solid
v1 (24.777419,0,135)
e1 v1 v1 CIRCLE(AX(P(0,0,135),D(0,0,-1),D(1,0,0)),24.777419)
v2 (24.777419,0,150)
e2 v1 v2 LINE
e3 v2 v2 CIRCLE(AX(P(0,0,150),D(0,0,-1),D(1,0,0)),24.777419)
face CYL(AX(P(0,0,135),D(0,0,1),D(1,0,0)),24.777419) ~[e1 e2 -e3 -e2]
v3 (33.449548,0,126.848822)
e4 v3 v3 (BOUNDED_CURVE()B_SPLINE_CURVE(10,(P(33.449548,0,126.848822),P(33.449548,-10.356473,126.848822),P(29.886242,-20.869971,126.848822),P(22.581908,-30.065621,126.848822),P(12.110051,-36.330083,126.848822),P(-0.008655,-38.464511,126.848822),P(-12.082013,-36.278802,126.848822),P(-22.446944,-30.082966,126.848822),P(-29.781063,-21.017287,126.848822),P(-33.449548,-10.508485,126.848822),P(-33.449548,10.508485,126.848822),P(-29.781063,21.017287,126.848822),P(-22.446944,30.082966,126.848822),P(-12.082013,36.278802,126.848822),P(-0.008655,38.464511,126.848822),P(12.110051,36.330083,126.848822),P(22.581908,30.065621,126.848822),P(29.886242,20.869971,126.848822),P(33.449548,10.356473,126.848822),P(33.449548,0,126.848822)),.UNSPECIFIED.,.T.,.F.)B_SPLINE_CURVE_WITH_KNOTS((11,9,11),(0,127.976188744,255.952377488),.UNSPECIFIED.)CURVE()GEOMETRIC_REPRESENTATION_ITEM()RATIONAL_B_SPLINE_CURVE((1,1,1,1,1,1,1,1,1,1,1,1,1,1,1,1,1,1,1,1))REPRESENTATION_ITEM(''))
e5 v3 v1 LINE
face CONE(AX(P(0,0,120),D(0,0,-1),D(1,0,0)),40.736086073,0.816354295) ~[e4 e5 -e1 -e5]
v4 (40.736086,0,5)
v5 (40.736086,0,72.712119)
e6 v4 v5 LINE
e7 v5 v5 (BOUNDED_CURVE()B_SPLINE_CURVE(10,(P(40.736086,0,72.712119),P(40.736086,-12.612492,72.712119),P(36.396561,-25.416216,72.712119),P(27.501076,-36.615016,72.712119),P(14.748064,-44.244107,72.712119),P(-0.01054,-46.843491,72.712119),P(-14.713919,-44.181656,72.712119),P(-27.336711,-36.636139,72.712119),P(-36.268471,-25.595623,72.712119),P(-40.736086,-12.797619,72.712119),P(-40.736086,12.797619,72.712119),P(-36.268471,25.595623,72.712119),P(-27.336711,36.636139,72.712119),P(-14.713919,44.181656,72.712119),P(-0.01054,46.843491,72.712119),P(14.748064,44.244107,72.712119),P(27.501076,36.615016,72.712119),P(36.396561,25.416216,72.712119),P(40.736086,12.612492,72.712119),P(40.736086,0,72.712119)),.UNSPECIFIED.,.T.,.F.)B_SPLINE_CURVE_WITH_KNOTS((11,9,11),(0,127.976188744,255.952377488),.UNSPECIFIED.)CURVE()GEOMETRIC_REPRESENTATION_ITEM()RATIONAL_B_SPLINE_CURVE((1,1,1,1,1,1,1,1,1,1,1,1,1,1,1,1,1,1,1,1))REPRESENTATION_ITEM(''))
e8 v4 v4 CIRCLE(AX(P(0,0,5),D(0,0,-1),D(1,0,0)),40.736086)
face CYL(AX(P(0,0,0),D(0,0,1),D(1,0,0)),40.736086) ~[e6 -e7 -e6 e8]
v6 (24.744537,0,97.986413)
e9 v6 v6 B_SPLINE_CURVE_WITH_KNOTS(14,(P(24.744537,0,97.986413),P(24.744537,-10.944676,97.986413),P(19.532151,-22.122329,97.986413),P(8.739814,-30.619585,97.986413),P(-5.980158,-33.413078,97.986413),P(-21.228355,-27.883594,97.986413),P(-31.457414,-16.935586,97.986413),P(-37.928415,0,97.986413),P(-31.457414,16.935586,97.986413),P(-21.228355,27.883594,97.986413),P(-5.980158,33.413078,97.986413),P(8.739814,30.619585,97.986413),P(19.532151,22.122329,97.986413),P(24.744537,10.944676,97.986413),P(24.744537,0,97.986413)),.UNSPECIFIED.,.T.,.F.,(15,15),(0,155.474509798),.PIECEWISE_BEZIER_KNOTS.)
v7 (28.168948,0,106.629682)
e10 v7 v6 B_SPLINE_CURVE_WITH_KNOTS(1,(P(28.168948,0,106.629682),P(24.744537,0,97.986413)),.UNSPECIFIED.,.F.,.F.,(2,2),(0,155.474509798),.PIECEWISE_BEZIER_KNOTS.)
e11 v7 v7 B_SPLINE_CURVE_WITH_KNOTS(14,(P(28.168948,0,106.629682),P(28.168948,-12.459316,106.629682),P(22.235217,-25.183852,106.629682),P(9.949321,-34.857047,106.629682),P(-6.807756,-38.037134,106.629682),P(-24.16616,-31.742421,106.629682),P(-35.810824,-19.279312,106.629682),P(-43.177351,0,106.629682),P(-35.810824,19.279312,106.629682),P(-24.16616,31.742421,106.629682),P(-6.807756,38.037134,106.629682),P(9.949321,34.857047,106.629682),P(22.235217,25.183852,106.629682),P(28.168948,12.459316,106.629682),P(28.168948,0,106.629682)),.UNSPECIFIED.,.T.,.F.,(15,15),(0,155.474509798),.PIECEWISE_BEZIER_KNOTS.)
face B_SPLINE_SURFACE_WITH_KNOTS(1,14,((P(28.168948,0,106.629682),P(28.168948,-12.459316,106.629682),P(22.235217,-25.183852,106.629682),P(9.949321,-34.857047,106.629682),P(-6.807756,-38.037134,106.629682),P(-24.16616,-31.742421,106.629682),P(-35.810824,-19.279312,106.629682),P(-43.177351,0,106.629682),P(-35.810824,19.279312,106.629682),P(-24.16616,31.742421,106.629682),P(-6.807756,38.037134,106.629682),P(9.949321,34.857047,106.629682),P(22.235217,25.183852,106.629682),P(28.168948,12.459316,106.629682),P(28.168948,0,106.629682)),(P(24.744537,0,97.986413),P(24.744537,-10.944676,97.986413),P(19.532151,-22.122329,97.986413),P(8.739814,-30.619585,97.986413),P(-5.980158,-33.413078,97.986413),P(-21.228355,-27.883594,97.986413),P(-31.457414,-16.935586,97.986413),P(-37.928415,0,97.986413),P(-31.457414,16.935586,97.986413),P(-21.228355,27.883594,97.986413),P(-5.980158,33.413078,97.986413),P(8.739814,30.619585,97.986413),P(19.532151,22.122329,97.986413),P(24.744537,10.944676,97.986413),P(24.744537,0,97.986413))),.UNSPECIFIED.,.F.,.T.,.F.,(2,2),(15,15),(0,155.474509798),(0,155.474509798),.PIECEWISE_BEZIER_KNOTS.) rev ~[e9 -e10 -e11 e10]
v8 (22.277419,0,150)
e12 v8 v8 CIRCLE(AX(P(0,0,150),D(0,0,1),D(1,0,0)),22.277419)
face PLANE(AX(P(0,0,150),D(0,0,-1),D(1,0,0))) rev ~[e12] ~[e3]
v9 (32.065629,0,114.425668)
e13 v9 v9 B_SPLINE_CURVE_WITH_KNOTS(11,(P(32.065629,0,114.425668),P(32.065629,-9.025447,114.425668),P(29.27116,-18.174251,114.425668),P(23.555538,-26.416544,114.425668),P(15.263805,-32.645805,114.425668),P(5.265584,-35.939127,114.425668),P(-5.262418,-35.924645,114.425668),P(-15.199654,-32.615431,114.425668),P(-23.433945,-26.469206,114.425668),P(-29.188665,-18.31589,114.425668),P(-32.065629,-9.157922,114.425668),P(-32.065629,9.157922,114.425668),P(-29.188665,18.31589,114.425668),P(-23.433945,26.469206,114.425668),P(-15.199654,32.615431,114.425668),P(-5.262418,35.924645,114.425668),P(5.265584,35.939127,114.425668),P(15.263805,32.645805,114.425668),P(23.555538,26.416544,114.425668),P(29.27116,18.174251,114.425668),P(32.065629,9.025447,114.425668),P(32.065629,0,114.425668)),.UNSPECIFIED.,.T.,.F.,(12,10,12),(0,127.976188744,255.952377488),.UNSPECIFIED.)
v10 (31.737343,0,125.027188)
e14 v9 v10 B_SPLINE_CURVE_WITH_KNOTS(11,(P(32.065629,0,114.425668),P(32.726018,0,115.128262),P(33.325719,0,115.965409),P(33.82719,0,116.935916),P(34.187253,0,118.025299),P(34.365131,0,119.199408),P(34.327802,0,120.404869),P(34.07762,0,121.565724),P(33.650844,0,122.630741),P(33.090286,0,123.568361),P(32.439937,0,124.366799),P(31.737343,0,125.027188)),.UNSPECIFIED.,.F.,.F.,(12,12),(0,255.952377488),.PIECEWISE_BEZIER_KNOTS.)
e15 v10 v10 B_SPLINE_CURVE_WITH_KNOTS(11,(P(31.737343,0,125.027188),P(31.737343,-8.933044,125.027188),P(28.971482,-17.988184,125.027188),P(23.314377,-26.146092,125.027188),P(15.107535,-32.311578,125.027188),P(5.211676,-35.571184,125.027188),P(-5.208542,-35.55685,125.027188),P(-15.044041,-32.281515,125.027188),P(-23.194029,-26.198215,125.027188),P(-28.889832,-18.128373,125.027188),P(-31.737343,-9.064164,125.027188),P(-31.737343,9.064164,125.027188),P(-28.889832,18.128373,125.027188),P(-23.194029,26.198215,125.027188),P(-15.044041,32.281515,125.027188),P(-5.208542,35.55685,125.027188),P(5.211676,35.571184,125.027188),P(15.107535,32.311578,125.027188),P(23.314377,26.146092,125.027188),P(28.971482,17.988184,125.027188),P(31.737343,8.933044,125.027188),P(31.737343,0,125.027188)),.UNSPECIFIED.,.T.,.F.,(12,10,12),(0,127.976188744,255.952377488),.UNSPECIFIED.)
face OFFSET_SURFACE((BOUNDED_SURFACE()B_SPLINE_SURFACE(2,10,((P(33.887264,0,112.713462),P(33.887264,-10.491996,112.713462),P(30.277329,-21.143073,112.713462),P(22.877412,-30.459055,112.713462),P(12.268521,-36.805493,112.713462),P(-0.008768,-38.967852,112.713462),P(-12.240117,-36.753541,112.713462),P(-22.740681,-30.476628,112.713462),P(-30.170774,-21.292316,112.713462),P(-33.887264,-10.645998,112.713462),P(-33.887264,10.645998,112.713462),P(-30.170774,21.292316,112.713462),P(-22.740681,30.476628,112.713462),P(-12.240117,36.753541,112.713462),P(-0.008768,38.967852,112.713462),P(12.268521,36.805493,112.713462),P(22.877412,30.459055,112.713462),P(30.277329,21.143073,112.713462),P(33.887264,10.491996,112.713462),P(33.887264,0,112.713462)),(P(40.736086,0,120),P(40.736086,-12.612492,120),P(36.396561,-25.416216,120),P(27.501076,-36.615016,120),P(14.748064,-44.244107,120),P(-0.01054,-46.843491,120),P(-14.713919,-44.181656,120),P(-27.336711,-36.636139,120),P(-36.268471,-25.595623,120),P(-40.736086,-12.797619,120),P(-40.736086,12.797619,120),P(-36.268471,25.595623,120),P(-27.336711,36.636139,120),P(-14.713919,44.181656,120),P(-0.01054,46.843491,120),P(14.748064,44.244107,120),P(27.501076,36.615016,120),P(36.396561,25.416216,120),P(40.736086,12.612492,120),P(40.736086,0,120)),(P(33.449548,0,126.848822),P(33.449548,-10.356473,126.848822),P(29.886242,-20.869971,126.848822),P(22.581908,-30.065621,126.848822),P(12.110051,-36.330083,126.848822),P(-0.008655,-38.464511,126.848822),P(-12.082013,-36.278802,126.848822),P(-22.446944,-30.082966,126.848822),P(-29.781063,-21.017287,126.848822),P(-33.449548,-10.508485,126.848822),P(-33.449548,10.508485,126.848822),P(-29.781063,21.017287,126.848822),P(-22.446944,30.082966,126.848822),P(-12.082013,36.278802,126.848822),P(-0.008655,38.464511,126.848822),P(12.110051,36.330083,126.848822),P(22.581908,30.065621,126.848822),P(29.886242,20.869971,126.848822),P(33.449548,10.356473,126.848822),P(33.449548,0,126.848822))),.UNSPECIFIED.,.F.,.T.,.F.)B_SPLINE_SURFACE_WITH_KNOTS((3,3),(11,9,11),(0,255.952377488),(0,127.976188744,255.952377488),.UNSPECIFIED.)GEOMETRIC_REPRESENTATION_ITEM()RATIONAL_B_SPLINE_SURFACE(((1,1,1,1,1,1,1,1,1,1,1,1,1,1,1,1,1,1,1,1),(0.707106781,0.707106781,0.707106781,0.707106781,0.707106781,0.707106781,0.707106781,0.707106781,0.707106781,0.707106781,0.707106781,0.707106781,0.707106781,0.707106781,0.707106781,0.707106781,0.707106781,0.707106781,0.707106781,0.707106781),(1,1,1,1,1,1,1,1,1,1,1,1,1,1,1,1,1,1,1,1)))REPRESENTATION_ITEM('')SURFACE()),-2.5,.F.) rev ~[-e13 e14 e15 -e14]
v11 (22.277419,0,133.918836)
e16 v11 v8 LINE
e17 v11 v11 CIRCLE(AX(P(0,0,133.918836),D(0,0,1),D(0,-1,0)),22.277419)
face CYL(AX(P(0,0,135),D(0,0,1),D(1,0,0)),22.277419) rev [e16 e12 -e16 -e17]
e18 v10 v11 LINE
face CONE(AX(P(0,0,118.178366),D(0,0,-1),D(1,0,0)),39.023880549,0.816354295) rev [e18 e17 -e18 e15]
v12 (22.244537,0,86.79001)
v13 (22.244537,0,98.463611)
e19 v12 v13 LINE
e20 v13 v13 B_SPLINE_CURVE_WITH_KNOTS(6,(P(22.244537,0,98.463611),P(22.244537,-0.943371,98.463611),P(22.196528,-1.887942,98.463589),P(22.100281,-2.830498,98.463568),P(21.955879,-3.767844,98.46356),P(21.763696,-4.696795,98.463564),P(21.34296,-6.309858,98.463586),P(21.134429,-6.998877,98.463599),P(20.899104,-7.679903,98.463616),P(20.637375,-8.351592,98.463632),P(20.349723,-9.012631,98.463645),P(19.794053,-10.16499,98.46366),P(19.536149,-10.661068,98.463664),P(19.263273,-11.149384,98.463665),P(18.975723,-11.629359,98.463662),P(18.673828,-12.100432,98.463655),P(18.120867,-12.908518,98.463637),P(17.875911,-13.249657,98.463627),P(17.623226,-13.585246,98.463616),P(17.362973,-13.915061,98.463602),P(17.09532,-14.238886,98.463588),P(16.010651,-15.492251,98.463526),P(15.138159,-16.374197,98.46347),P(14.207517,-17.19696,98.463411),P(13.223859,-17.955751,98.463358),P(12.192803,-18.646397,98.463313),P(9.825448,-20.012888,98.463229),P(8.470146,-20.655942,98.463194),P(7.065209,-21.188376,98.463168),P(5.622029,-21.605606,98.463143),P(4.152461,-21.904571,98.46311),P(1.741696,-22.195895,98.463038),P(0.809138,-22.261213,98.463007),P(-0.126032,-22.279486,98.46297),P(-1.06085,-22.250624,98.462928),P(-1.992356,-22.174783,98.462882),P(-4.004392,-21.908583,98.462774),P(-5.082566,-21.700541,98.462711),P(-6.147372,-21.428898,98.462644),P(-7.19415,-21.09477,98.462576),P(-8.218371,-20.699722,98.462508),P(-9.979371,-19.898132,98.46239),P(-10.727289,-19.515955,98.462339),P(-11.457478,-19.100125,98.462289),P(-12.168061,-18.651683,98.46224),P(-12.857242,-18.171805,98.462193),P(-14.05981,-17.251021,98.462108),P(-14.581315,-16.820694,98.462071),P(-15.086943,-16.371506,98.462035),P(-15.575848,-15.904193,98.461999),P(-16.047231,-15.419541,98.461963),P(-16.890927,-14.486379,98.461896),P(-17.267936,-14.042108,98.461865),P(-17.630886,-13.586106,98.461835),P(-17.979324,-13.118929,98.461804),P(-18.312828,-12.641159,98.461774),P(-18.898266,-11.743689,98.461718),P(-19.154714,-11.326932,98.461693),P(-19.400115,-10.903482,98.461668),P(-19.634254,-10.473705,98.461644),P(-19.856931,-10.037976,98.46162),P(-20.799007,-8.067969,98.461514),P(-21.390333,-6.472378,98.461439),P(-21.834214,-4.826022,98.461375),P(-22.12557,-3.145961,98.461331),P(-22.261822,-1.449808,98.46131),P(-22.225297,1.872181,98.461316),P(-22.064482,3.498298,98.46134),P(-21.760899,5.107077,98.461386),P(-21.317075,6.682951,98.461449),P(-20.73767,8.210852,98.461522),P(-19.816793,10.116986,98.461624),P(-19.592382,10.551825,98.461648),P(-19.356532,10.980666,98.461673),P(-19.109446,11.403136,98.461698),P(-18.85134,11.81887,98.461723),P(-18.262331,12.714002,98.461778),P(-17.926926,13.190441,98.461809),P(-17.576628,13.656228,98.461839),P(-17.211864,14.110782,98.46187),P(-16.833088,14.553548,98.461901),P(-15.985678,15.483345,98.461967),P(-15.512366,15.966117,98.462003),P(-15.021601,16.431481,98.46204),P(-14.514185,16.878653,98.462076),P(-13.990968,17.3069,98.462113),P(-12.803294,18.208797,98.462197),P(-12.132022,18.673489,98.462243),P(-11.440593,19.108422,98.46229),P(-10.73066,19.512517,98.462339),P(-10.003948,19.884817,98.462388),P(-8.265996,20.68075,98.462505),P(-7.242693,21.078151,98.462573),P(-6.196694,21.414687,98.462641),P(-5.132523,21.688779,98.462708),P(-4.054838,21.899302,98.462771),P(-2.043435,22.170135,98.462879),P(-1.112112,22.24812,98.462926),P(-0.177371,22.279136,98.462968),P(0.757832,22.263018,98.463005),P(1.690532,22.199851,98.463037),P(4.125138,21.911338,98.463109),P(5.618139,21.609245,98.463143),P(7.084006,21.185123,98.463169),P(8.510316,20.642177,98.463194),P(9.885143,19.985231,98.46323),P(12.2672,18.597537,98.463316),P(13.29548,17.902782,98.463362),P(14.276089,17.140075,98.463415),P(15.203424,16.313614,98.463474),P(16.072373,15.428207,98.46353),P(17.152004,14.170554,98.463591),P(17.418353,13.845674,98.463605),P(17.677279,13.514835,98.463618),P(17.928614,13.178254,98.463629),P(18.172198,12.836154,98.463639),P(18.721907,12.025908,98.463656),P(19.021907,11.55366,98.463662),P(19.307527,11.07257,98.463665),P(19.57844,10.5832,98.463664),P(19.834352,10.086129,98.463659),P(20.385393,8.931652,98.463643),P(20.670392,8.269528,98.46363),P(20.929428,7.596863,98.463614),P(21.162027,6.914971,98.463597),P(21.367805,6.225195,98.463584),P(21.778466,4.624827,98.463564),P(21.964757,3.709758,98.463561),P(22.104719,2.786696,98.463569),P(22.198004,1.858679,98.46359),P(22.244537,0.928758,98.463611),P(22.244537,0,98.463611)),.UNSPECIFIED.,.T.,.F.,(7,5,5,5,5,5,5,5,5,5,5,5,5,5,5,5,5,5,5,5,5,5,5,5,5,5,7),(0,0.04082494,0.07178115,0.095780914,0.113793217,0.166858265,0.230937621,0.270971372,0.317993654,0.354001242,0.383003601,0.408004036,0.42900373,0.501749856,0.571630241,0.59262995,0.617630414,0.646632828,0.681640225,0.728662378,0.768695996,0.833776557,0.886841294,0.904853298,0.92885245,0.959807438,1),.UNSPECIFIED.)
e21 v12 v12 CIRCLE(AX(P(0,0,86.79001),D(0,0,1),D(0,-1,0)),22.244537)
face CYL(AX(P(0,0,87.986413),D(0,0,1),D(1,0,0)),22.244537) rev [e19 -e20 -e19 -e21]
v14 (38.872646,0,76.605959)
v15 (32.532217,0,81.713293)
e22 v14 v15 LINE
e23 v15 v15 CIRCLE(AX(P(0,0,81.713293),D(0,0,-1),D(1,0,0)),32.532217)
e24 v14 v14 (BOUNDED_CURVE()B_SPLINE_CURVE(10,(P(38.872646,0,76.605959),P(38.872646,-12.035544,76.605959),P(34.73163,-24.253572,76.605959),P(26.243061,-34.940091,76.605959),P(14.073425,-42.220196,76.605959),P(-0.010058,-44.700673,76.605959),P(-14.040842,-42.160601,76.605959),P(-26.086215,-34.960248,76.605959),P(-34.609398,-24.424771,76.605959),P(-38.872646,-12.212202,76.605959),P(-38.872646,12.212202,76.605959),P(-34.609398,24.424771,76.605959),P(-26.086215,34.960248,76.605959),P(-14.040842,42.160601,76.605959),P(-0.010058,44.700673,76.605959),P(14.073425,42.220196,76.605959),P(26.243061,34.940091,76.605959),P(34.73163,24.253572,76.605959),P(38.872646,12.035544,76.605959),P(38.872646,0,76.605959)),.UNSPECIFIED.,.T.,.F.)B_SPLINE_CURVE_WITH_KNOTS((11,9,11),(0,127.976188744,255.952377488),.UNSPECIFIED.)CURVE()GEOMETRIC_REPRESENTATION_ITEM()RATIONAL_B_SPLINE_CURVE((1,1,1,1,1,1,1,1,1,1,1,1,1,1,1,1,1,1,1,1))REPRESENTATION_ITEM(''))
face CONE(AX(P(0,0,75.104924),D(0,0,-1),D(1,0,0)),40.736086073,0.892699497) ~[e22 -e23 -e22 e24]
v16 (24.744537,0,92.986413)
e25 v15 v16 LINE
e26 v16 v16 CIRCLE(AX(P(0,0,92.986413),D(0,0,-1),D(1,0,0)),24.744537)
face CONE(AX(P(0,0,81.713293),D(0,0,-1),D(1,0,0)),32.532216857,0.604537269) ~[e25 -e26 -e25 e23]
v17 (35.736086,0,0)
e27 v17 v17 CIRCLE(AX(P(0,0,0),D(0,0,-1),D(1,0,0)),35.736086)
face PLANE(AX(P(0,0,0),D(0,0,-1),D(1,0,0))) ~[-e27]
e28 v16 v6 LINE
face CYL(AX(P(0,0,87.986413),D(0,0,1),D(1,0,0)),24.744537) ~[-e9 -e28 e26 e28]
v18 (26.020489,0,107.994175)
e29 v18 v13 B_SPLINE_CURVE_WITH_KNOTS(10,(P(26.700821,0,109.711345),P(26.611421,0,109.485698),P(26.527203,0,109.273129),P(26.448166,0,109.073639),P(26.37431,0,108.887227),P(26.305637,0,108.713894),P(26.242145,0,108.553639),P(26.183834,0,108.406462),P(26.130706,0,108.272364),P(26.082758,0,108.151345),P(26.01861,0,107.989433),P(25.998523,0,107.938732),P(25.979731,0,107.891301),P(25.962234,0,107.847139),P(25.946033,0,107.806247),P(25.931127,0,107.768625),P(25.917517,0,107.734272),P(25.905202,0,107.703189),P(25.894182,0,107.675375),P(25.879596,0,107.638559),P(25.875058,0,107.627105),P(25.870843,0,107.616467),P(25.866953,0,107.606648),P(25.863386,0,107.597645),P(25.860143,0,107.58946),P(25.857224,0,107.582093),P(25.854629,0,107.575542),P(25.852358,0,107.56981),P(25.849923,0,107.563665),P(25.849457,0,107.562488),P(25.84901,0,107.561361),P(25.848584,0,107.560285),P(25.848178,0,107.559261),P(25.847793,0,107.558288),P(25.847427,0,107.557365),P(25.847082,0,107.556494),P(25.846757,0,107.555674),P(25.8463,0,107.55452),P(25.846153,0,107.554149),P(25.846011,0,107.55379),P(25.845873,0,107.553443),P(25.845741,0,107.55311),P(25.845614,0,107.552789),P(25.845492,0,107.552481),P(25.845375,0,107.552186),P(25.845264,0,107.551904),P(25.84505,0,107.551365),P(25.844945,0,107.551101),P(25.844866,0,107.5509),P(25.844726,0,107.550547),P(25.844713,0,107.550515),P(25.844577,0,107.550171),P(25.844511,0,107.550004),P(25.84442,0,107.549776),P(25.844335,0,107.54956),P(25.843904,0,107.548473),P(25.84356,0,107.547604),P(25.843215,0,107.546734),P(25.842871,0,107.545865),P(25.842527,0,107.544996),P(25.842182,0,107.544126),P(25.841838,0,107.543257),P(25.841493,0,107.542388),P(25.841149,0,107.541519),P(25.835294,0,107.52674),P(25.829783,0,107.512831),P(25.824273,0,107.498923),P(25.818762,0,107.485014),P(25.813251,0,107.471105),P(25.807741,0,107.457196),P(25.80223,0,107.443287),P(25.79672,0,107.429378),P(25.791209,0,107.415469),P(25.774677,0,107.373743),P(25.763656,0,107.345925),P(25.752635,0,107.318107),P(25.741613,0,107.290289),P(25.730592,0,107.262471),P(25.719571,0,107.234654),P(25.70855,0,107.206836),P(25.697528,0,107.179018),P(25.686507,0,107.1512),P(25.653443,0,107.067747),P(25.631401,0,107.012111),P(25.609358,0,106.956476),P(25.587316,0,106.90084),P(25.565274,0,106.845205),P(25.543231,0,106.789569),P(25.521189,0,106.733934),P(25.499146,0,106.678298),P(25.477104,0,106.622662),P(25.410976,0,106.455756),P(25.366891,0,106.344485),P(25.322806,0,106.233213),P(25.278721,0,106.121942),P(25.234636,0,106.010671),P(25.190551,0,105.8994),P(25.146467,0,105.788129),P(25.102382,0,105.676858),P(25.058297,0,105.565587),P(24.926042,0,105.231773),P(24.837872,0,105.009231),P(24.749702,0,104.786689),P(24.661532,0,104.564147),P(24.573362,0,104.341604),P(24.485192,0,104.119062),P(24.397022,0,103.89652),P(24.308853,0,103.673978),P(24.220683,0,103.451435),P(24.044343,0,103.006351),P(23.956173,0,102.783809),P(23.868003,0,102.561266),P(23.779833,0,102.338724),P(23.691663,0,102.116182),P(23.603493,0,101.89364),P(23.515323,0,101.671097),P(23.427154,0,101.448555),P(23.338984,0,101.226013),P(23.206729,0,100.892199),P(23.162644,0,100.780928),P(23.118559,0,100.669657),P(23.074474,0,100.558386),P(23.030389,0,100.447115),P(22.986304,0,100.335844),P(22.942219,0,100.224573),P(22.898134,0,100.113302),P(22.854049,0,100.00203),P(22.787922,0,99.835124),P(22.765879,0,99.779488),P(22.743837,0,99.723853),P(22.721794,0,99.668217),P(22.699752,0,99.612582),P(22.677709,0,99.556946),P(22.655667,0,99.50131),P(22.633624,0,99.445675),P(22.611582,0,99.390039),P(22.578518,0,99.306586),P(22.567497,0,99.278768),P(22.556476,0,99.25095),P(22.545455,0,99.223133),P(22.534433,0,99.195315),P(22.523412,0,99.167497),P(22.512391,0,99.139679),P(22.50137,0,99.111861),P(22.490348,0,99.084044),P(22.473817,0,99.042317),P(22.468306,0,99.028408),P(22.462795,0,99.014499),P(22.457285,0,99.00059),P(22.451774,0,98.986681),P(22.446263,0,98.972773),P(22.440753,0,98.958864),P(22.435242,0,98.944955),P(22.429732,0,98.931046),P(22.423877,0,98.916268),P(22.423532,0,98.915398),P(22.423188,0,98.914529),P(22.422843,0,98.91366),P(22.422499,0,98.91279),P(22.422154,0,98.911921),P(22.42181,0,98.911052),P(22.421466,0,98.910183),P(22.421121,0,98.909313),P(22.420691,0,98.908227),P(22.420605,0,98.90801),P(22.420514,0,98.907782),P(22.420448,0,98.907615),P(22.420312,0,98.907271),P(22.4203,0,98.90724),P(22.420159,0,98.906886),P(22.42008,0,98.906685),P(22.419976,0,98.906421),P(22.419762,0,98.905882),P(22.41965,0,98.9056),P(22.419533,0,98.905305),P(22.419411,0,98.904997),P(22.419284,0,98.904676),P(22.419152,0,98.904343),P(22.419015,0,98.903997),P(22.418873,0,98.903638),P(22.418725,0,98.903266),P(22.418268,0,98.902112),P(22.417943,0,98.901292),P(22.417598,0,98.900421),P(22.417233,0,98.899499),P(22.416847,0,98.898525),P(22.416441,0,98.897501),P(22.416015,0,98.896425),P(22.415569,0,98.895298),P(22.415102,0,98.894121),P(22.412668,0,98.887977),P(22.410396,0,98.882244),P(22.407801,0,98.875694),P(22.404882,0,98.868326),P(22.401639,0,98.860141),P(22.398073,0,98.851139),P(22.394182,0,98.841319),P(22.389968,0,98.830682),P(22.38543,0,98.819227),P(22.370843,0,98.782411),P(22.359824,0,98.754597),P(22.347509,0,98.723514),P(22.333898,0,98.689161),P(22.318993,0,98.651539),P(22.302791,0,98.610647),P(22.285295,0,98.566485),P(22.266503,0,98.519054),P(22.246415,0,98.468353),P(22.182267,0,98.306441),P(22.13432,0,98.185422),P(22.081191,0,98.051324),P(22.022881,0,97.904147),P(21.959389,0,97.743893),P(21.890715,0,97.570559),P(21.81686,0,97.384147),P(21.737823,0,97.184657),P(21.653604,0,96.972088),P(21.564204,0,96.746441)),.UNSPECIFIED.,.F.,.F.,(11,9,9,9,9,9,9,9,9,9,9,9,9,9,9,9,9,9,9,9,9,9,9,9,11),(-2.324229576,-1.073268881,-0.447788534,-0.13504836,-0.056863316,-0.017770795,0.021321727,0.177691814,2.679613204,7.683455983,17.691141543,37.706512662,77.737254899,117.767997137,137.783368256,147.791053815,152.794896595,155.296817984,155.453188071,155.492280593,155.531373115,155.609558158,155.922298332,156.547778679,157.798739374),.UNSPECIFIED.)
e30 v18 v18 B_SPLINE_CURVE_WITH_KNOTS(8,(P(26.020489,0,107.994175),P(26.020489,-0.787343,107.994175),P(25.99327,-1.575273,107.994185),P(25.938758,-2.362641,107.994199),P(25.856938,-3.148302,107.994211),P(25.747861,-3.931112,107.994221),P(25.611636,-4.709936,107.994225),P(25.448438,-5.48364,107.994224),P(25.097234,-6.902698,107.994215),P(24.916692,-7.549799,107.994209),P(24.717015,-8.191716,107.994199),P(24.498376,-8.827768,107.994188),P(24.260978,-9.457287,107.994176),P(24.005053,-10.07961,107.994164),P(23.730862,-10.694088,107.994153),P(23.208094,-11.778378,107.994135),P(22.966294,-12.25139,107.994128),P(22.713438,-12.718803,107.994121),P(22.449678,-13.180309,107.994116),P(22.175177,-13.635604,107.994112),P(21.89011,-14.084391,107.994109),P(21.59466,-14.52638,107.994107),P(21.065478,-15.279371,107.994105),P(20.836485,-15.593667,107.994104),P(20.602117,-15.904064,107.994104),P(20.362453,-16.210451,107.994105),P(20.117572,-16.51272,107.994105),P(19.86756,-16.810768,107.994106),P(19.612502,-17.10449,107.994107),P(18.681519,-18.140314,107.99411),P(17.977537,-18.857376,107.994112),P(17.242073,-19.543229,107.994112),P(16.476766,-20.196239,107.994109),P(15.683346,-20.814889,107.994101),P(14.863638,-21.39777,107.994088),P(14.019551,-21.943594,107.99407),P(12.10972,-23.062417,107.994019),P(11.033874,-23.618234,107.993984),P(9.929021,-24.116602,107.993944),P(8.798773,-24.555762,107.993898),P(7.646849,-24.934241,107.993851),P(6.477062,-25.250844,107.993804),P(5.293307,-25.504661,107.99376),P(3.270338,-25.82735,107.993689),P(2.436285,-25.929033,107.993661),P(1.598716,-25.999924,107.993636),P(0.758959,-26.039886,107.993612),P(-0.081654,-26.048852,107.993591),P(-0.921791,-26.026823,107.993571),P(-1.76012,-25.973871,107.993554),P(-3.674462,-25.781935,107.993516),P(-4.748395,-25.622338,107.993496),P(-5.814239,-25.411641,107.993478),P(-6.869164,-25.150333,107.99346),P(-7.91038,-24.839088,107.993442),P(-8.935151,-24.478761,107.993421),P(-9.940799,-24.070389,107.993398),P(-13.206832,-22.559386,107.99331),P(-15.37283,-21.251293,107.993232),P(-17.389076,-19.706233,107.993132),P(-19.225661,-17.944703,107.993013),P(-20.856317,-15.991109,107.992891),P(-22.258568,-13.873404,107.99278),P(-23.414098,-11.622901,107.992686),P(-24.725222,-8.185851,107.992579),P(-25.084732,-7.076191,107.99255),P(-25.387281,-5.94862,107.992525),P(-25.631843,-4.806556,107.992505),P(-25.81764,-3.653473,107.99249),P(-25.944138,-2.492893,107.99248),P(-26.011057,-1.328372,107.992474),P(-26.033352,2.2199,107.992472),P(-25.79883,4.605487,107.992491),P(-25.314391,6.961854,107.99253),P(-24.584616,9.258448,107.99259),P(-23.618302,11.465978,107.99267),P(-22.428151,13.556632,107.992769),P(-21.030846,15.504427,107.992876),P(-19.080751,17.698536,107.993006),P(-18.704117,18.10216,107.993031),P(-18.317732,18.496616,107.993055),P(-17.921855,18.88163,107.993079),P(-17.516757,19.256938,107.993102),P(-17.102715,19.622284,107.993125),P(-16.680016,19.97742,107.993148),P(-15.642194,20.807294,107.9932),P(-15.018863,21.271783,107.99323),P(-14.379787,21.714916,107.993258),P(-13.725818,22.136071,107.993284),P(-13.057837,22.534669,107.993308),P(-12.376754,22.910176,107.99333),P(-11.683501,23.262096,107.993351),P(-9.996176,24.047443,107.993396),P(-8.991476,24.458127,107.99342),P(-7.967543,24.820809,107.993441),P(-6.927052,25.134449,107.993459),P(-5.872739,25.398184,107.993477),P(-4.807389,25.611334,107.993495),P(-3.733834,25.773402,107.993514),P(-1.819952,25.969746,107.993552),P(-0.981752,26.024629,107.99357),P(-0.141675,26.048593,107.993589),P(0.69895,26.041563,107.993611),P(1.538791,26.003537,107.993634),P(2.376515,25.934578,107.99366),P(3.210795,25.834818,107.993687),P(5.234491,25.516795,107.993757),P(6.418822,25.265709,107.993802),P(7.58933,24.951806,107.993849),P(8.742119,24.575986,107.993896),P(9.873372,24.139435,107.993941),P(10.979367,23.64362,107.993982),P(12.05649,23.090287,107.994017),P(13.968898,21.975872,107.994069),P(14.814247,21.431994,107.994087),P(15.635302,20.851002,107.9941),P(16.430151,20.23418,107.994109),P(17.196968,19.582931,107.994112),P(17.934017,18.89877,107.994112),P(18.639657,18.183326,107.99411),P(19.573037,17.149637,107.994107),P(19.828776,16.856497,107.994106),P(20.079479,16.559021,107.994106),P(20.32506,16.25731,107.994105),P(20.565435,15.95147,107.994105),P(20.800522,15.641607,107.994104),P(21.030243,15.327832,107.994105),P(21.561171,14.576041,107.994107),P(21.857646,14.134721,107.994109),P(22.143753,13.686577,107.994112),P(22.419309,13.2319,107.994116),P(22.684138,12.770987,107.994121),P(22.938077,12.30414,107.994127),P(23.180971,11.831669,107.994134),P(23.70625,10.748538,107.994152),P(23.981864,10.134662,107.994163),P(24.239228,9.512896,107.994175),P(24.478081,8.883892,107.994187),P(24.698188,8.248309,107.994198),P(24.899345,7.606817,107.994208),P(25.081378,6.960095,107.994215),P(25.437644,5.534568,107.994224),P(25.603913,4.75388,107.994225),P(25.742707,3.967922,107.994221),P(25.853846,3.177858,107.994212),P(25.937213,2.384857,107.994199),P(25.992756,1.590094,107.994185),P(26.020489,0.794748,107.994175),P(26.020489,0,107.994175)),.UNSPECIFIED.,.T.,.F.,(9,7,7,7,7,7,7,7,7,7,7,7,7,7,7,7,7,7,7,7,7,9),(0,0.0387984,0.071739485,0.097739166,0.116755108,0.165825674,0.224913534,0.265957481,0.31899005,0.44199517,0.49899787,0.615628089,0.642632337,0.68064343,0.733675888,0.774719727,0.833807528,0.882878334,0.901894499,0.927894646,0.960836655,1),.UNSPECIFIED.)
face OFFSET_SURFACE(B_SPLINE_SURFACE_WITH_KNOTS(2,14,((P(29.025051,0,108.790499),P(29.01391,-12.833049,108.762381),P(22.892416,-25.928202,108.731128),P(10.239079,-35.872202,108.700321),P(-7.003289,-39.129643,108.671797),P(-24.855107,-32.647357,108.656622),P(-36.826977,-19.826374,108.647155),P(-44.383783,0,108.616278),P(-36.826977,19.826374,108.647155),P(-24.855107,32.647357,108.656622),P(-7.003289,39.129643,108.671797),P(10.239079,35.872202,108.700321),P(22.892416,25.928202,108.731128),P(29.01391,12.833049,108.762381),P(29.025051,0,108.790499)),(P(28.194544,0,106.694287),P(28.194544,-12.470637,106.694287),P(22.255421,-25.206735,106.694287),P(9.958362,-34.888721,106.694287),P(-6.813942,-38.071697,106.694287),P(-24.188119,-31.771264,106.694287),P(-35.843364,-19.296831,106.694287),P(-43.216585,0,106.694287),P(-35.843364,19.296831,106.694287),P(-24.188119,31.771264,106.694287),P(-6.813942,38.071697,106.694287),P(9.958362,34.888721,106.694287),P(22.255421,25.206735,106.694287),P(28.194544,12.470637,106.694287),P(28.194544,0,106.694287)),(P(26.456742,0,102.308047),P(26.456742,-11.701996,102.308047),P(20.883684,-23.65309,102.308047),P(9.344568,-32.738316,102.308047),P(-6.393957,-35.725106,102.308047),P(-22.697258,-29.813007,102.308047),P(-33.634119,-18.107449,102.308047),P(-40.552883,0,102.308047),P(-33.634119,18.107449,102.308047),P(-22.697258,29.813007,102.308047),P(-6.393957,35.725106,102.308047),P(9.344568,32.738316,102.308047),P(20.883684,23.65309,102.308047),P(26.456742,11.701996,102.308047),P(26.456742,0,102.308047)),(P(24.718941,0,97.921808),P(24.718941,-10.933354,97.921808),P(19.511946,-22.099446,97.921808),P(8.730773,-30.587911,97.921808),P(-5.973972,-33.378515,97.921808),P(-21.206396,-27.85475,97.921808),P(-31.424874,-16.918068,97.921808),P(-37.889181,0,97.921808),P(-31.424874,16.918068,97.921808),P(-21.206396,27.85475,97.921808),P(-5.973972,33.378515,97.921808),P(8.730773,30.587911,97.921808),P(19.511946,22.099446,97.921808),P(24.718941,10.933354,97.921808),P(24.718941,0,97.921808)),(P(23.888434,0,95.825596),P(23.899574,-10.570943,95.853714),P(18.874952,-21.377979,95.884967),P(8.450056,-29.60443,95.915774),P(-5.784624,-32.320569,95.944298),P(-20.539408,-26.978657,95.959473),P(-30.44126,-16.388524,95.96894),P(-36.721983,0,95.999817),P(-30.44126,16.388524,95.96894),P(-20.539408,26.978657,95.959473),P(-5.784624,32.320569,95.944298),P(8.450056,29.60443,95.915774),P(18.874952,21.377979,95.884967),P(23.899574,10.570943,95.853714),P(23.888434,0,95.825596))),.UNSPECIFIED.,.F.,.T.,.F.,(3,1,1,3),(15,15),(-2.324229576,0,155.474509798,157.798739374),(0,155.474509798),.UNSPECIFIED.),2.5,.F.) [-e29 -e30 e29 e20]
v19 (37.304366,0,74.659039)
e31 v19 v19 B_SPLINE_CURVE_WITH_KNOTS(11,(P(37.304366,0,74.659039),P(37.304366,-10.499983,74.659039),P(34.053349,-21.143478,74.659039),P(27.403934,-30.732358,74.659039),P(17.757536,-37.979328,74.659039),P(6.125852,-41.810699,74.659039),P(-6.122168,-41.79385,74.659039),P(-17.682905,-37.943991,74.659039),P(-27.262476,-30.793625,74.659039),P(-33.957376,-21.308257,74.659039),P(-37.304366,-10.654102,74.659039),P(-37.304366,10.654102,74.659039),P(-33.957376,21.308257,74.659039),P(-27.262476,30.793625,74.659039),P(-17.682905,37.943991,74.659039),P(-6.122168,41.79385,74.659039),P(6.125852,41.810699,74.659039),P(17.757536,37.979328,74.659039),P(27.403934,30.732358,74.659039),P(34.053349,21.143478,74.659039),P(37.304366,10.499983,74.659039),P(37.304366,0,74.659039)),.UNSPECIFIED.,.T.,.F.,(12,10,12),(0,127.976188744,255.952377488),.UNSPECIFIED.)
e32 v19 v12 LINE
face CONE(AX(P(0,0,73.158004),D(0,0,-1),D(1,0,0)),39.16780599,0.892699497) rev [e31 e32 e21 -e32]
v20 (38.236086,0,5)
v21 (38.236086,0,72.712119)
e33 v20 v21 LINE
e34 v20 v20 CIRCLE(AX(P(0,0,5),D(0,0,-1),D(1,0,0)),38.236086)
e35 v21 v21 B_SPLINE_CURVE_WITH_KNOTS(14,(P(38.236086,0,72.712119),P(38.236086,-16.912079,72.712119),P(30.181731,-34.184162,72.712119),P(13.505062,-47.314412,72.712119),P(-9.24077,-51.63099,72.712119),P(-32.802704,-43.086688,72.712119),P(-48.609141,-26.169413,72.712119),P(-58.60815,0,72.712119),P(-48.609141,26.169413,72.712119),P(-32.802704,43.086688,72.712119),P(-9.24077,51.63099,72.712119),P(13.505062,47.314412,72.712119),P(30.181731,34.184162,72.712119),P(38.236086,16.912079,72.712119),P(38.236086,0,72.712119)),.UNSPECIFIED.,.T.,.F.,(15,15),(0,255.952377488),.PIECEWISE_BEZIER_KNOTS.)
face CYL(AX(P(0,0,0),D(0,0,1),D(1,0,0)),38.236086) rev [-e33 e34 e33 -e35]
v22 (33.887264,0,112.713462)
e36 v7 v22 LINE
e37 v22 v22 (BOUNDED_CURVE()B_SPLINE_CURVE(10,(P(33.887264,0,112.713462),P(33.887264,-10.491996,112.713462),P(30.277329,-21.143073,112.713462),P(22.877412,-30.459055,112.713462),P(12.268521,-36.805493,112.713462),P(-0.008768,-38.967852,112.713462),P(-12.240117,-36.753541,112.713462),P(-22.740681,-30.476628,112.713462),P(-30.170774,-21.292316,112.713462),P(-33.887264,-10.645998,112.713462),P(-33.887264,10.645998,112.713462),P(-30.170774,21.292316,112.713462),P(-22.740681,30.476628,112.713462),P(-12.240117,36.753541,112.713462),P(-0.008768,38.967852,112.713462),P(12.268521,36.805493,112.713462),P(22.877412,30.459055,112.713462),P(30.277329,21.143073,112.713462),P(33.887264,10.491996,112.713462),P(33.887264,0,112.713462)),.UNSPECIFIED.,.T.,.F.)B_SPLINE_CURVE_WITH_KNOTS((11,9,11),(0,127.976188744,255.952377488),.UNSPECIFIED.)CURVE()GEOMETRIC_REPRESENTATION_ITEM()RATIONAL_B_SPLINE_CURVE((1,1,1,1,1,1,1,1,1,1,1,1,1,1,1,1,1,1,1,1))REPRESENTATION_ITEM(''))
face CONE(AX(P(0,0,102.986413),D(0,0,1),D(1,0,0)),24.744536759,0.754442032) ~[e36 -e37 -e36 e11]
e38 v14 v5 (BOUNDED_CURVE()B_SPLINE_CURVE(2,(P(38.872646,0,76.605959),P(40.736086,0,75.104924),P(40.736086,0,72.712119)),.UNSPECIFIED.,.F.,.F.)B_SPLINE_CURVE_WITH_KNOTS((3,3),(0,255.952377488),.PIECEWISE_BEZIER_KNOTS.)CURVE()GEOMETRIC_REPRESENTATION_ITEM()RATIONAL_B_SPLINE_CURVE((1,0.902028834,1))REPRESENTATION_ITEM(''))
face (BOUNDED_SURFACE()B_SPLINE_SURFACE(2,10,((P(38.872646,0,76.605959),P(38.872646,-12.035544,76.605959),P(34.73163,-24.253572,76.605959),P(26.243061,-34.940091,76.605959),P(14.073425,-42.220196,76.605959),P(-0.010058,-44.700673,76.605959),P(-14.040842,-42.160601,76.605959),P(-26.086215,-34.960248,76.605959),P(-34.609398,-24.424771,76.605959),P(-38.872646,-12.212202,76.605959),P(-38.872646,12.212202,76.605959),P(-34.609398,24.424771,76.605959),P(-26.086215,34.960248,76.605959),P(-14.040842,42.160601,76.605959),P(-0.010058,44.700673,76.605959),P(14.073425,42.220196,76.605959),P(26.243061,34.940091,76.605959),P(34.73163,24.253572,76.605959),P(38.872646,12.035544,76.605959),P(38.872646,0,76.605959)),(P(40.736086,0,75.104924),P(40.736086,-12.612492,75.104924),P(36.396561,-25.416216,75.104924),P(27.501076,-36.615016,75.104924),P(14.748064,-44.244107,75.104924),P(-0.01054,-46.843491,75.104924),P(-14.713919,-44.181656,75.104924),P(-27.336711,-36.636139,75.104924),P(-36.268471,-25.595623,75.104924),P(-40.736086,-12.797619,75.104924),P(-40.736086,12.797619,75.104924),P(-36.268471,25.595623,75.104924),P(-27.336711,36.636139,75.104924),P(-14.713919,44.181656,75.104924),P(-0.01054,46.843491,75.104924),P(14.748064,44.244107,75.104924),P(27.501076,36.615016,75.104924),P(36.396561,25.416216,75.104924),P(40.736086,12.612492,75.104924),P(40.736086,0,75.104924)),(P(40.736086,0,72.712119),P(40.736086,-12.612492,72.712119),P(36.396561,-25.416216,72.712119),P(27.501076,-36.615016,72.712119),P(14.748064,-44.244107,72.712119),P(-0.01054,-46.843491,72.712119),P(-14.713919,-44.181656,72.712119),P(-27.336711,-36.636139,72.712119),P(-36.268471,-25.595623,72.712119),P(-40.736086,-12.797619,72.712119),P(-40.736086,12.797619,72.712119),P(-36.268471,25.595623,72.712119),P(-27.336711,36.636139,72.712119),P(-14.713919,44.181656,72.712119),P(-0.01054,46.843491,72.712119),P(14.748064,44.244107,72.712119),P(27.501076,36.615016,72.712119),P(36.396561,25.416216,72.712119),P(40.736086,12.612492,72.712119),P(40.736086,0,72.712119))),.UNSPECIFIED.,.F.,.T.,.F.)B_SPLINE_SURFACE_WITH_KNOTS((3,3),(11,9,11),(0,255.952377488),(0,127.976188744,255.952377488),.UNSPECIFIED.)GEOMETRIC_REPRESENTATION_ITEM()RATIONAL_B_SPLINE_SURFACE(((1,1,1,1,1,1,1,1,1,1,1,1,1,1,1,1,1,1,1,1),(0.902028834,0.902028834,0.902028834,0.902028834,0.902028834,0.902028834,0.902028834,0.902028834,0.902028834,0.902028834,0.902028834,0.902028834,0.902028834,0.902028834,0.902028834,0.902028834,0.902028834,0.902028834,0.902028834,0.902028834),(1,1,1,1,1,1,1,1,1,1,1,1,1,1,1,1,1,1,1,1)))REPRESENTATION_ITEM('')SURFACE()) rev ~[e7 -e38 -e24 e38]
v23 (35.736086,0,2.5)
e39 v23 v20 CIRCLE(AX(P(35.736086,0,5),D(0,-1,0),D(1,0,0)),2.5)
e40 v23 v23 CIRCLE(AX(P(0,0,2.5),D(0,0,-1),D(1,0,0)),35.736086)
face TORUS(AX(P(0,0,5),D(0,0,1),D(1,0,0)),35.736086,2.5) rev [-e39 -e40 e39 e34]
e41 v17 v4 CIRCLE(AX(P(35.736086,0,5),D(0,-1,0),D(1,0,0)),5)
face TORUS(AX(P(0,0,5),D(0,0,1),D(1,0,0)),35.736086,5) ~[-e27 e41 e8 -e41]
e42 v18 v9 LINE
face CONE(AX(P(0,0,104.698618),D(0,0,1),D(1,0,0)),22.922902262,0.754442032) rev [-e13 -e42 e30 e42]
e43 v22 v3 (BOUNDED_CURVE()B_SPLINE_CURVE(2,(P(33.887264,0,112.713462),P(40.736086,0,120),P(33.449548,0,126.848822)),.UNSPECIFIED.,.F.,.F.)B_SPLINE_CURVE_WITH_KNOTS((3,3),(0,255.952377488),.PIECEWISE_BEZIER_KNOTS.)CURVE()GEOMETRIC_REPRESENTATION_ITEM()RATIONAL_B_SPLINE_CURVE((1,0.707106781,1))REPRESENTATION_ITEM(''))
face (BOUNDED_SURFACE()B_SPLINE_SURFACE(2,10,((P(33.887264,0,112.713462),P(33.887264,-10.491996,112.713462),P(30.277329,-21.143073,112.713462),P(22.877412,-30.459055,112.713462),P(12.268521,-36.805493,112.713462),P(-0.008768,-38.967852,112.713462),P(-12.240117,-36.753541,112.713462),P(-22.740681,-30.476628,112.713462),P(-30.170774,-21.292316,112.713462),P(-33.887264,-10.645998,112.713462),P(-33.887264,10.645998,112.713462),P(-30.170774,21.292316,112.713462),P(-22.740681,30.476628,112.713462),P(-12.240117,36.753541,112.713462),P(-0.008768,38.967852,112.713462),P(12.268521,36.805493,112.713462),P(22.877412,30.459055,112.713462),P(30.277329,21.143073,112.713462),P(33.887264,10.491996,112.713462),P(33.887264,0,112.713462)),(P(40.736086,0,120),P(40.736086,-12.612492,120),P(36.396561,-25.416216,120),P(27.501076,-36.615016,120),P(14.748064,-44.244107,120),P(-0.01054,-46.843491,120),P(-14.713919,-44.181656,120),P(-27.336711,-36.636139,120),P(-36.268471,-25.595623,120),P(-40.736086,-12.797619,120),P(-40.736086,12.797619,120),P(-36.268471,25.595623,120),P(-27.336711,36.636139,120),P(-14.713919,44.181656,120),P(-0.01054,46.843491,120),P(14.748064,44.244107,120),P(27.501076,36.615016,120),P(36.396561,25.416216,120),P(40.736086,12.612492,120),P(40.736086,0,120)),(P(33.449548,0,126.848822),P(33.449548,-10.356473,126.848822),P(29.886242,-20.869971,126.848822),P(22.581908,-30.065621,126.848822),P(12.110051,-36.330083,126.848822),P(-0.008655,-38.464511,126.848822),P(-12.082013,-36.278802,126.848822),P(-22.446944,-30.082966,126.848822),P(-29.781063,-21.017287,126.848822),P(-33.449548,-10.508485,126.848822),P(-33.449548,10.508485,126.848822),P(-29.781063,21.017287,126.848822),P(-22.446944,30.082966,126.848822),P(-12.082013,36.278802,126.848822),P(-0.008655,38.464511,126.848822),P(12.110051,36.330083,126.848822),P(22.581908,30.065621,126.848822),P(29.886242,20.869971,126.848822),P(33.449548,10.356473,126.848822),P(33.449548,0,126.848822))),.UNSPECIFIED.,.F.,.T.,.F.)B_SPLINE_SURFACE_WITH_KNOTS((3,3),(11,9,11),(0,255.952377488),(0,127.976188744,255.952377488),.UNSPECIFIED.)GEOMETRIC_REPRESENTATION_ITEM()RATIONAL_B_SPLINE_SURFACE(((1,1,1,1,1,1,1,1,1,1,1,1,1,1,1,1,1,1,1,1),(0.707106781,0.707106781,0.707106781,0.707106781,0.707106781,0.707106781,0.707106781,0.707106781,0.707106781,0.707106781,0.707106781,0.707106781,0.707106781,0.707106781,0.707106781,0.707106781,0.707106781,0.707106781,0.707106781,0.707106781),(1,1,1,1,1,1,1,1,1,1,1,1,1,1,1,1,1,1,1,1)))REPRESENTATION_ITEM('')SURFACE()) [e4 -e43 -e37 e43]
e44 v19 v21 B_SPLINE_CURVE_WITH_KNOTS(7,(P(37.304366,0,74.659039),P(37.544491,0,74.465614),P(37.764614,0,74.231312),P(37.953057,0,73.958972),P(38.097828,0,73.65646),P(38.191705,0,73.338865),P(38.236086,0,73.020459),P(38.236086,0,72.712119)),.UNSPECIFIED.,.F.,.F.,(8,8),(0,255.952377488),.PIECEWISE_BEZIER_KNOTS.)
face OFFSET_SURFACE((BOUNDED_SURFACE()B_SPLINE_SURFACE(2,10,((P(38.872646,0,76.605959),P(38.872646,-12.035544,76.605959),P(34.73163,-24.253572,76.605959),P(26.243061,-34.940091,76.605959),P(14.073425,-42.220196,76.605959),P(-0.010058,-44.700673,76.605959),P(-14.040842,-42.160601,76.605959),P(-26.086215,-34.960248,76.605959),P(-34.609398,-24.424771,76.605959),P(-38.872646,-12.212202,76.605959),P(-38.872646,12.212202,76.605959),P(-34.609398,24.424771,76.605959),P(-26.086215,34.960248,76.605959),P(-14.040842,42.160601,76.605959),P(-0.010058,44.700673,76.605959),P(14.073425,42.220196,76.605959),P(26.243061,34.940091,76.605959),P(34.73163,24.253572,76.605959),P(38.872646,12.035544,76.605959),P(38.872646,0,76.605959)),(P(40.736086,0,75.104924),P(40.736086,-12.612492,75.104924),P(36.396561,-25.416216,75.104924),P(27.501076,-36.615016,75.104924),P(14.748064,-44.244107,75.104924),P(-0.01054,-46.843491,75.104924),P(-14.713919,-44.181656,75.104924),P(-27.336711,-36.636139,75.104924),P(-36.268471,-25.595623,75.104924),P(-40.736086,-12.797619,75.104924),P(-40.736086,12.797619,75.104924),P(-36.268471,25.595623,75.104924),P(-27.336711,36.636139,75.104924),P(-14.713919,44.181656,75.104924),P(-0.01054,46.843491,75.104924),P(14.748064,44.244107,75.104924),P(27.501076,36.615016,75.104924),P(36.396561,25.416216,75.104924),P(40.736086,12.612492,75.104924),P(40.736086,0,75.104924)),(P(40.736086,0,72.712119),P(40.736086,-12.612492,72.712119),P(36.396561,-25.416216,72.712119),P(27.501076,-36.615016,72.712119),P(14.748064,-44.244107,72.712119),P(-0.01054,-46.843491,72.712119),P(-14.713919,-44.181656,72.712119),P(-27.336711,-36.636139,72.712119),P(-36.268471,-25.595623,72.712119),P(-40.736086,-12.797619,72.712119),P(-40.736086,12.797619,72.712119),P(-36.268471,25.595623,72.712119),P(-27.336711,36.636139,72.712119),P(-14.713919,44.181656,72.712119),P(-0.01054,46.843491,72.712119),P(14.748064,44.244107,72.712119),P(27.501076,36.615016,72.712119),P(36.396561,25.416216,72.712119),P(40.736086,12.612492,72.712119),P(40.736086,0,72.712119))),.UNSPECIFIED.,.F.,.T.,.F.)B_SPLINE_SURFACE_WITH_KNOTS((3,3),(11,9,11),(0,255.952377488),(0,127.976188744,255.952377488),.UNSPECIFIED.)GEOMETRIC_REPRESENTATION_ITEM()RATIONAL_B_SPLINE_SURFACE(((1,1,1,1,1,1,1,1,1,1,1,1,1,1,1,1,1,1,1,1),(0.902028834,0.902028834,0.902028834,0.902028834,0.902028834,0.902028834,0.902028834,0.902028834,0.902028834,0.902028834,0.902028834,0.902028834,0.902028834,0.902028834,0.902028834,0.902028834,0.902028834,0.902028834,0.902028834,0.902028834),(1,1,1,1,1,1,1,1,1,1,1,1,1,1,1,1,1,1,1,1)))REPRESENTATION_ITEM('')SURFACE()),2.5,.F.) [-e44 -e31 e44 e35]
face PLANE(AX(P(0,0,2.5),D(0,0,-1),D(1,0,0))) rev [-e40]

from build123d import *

# Parameters (mm, degrees)
F2_R    = 5
F3_R    = 10
F4_SIZE = 5
F5_R    = 5
F6_T    = -2.5


# Not quite as in the source:
# - a fillet or chamfer that OpenCascade refuses, or shapes differently, is made with other operations: its cross-section is extruded or revolved along the edge and cut away or added


with BuildPart() as f1:
    # F0 (on Front) → F1 (revolve)
    with BuildSketch(Plane.XZ):
        Polygon((0, 150), (0, 0), (40.7360860733, 0), (40.7360860733, 75.1049241643), (24.7445367592, 87.9864128578), (24.7445367592, 102.9864128578), (40.7360860733, 120), (24.7774192725, 135), (24.7774192725, 150), align=None)
    revolve(axis=Axis((0, 0, 75), (0, 0, -1)))

    # F2
    f2_edges = [f1.edges().sort_by_distance(p)[0] for p in [
        (-40.736086, 0, 0),
    ]]
    fillet(f2_edges, radius=F2_R)

    # F3
    f3_edges = [f1.edges().sort_by_distance(p)[0] for p in [
        (-40.736086, 0, 120),
    ]]
    fillet(f3_edges, radius=F3_R)

    # F4
    f4_edges = [f1.edges().sort_by_distance(p)[0] for p in [
        (-24.744537, 0, 102.986413),
    ]]
    chamfer(f4_edges, length=F4_SIZE)

    # F5
    f5_edges = [f1.edges().sort_by_distance(p)[0] for p in [
        (-40.736086, 0, 75.104924),
    ]]
    fillet(f5_edges, radius=F5_R)

    # F6
    f6_openings = [f1.faces().sort_by_distance(p)[0] for p in [
        (0, 0, 150),
    ]]
    offset(amount=F6_T, openings=f6_openings, kind=Kind.INTERSECTION)

    # F7: chamfer of 5 x 10 on 1 edges, made by hand

    # F7_s1 → F7_t2 (revolve)
    with BuildSketch(Plane.XZ):
        Polygon((32.5322168572, 81.7132925265), (24.7445367592, 92.9864128578), (24.7445367592, 87.9864128578), align=None)
    revolve(axis=Axis((0, 0, 87.9864128578), (0, 0, -1)))


solid = f1.part
